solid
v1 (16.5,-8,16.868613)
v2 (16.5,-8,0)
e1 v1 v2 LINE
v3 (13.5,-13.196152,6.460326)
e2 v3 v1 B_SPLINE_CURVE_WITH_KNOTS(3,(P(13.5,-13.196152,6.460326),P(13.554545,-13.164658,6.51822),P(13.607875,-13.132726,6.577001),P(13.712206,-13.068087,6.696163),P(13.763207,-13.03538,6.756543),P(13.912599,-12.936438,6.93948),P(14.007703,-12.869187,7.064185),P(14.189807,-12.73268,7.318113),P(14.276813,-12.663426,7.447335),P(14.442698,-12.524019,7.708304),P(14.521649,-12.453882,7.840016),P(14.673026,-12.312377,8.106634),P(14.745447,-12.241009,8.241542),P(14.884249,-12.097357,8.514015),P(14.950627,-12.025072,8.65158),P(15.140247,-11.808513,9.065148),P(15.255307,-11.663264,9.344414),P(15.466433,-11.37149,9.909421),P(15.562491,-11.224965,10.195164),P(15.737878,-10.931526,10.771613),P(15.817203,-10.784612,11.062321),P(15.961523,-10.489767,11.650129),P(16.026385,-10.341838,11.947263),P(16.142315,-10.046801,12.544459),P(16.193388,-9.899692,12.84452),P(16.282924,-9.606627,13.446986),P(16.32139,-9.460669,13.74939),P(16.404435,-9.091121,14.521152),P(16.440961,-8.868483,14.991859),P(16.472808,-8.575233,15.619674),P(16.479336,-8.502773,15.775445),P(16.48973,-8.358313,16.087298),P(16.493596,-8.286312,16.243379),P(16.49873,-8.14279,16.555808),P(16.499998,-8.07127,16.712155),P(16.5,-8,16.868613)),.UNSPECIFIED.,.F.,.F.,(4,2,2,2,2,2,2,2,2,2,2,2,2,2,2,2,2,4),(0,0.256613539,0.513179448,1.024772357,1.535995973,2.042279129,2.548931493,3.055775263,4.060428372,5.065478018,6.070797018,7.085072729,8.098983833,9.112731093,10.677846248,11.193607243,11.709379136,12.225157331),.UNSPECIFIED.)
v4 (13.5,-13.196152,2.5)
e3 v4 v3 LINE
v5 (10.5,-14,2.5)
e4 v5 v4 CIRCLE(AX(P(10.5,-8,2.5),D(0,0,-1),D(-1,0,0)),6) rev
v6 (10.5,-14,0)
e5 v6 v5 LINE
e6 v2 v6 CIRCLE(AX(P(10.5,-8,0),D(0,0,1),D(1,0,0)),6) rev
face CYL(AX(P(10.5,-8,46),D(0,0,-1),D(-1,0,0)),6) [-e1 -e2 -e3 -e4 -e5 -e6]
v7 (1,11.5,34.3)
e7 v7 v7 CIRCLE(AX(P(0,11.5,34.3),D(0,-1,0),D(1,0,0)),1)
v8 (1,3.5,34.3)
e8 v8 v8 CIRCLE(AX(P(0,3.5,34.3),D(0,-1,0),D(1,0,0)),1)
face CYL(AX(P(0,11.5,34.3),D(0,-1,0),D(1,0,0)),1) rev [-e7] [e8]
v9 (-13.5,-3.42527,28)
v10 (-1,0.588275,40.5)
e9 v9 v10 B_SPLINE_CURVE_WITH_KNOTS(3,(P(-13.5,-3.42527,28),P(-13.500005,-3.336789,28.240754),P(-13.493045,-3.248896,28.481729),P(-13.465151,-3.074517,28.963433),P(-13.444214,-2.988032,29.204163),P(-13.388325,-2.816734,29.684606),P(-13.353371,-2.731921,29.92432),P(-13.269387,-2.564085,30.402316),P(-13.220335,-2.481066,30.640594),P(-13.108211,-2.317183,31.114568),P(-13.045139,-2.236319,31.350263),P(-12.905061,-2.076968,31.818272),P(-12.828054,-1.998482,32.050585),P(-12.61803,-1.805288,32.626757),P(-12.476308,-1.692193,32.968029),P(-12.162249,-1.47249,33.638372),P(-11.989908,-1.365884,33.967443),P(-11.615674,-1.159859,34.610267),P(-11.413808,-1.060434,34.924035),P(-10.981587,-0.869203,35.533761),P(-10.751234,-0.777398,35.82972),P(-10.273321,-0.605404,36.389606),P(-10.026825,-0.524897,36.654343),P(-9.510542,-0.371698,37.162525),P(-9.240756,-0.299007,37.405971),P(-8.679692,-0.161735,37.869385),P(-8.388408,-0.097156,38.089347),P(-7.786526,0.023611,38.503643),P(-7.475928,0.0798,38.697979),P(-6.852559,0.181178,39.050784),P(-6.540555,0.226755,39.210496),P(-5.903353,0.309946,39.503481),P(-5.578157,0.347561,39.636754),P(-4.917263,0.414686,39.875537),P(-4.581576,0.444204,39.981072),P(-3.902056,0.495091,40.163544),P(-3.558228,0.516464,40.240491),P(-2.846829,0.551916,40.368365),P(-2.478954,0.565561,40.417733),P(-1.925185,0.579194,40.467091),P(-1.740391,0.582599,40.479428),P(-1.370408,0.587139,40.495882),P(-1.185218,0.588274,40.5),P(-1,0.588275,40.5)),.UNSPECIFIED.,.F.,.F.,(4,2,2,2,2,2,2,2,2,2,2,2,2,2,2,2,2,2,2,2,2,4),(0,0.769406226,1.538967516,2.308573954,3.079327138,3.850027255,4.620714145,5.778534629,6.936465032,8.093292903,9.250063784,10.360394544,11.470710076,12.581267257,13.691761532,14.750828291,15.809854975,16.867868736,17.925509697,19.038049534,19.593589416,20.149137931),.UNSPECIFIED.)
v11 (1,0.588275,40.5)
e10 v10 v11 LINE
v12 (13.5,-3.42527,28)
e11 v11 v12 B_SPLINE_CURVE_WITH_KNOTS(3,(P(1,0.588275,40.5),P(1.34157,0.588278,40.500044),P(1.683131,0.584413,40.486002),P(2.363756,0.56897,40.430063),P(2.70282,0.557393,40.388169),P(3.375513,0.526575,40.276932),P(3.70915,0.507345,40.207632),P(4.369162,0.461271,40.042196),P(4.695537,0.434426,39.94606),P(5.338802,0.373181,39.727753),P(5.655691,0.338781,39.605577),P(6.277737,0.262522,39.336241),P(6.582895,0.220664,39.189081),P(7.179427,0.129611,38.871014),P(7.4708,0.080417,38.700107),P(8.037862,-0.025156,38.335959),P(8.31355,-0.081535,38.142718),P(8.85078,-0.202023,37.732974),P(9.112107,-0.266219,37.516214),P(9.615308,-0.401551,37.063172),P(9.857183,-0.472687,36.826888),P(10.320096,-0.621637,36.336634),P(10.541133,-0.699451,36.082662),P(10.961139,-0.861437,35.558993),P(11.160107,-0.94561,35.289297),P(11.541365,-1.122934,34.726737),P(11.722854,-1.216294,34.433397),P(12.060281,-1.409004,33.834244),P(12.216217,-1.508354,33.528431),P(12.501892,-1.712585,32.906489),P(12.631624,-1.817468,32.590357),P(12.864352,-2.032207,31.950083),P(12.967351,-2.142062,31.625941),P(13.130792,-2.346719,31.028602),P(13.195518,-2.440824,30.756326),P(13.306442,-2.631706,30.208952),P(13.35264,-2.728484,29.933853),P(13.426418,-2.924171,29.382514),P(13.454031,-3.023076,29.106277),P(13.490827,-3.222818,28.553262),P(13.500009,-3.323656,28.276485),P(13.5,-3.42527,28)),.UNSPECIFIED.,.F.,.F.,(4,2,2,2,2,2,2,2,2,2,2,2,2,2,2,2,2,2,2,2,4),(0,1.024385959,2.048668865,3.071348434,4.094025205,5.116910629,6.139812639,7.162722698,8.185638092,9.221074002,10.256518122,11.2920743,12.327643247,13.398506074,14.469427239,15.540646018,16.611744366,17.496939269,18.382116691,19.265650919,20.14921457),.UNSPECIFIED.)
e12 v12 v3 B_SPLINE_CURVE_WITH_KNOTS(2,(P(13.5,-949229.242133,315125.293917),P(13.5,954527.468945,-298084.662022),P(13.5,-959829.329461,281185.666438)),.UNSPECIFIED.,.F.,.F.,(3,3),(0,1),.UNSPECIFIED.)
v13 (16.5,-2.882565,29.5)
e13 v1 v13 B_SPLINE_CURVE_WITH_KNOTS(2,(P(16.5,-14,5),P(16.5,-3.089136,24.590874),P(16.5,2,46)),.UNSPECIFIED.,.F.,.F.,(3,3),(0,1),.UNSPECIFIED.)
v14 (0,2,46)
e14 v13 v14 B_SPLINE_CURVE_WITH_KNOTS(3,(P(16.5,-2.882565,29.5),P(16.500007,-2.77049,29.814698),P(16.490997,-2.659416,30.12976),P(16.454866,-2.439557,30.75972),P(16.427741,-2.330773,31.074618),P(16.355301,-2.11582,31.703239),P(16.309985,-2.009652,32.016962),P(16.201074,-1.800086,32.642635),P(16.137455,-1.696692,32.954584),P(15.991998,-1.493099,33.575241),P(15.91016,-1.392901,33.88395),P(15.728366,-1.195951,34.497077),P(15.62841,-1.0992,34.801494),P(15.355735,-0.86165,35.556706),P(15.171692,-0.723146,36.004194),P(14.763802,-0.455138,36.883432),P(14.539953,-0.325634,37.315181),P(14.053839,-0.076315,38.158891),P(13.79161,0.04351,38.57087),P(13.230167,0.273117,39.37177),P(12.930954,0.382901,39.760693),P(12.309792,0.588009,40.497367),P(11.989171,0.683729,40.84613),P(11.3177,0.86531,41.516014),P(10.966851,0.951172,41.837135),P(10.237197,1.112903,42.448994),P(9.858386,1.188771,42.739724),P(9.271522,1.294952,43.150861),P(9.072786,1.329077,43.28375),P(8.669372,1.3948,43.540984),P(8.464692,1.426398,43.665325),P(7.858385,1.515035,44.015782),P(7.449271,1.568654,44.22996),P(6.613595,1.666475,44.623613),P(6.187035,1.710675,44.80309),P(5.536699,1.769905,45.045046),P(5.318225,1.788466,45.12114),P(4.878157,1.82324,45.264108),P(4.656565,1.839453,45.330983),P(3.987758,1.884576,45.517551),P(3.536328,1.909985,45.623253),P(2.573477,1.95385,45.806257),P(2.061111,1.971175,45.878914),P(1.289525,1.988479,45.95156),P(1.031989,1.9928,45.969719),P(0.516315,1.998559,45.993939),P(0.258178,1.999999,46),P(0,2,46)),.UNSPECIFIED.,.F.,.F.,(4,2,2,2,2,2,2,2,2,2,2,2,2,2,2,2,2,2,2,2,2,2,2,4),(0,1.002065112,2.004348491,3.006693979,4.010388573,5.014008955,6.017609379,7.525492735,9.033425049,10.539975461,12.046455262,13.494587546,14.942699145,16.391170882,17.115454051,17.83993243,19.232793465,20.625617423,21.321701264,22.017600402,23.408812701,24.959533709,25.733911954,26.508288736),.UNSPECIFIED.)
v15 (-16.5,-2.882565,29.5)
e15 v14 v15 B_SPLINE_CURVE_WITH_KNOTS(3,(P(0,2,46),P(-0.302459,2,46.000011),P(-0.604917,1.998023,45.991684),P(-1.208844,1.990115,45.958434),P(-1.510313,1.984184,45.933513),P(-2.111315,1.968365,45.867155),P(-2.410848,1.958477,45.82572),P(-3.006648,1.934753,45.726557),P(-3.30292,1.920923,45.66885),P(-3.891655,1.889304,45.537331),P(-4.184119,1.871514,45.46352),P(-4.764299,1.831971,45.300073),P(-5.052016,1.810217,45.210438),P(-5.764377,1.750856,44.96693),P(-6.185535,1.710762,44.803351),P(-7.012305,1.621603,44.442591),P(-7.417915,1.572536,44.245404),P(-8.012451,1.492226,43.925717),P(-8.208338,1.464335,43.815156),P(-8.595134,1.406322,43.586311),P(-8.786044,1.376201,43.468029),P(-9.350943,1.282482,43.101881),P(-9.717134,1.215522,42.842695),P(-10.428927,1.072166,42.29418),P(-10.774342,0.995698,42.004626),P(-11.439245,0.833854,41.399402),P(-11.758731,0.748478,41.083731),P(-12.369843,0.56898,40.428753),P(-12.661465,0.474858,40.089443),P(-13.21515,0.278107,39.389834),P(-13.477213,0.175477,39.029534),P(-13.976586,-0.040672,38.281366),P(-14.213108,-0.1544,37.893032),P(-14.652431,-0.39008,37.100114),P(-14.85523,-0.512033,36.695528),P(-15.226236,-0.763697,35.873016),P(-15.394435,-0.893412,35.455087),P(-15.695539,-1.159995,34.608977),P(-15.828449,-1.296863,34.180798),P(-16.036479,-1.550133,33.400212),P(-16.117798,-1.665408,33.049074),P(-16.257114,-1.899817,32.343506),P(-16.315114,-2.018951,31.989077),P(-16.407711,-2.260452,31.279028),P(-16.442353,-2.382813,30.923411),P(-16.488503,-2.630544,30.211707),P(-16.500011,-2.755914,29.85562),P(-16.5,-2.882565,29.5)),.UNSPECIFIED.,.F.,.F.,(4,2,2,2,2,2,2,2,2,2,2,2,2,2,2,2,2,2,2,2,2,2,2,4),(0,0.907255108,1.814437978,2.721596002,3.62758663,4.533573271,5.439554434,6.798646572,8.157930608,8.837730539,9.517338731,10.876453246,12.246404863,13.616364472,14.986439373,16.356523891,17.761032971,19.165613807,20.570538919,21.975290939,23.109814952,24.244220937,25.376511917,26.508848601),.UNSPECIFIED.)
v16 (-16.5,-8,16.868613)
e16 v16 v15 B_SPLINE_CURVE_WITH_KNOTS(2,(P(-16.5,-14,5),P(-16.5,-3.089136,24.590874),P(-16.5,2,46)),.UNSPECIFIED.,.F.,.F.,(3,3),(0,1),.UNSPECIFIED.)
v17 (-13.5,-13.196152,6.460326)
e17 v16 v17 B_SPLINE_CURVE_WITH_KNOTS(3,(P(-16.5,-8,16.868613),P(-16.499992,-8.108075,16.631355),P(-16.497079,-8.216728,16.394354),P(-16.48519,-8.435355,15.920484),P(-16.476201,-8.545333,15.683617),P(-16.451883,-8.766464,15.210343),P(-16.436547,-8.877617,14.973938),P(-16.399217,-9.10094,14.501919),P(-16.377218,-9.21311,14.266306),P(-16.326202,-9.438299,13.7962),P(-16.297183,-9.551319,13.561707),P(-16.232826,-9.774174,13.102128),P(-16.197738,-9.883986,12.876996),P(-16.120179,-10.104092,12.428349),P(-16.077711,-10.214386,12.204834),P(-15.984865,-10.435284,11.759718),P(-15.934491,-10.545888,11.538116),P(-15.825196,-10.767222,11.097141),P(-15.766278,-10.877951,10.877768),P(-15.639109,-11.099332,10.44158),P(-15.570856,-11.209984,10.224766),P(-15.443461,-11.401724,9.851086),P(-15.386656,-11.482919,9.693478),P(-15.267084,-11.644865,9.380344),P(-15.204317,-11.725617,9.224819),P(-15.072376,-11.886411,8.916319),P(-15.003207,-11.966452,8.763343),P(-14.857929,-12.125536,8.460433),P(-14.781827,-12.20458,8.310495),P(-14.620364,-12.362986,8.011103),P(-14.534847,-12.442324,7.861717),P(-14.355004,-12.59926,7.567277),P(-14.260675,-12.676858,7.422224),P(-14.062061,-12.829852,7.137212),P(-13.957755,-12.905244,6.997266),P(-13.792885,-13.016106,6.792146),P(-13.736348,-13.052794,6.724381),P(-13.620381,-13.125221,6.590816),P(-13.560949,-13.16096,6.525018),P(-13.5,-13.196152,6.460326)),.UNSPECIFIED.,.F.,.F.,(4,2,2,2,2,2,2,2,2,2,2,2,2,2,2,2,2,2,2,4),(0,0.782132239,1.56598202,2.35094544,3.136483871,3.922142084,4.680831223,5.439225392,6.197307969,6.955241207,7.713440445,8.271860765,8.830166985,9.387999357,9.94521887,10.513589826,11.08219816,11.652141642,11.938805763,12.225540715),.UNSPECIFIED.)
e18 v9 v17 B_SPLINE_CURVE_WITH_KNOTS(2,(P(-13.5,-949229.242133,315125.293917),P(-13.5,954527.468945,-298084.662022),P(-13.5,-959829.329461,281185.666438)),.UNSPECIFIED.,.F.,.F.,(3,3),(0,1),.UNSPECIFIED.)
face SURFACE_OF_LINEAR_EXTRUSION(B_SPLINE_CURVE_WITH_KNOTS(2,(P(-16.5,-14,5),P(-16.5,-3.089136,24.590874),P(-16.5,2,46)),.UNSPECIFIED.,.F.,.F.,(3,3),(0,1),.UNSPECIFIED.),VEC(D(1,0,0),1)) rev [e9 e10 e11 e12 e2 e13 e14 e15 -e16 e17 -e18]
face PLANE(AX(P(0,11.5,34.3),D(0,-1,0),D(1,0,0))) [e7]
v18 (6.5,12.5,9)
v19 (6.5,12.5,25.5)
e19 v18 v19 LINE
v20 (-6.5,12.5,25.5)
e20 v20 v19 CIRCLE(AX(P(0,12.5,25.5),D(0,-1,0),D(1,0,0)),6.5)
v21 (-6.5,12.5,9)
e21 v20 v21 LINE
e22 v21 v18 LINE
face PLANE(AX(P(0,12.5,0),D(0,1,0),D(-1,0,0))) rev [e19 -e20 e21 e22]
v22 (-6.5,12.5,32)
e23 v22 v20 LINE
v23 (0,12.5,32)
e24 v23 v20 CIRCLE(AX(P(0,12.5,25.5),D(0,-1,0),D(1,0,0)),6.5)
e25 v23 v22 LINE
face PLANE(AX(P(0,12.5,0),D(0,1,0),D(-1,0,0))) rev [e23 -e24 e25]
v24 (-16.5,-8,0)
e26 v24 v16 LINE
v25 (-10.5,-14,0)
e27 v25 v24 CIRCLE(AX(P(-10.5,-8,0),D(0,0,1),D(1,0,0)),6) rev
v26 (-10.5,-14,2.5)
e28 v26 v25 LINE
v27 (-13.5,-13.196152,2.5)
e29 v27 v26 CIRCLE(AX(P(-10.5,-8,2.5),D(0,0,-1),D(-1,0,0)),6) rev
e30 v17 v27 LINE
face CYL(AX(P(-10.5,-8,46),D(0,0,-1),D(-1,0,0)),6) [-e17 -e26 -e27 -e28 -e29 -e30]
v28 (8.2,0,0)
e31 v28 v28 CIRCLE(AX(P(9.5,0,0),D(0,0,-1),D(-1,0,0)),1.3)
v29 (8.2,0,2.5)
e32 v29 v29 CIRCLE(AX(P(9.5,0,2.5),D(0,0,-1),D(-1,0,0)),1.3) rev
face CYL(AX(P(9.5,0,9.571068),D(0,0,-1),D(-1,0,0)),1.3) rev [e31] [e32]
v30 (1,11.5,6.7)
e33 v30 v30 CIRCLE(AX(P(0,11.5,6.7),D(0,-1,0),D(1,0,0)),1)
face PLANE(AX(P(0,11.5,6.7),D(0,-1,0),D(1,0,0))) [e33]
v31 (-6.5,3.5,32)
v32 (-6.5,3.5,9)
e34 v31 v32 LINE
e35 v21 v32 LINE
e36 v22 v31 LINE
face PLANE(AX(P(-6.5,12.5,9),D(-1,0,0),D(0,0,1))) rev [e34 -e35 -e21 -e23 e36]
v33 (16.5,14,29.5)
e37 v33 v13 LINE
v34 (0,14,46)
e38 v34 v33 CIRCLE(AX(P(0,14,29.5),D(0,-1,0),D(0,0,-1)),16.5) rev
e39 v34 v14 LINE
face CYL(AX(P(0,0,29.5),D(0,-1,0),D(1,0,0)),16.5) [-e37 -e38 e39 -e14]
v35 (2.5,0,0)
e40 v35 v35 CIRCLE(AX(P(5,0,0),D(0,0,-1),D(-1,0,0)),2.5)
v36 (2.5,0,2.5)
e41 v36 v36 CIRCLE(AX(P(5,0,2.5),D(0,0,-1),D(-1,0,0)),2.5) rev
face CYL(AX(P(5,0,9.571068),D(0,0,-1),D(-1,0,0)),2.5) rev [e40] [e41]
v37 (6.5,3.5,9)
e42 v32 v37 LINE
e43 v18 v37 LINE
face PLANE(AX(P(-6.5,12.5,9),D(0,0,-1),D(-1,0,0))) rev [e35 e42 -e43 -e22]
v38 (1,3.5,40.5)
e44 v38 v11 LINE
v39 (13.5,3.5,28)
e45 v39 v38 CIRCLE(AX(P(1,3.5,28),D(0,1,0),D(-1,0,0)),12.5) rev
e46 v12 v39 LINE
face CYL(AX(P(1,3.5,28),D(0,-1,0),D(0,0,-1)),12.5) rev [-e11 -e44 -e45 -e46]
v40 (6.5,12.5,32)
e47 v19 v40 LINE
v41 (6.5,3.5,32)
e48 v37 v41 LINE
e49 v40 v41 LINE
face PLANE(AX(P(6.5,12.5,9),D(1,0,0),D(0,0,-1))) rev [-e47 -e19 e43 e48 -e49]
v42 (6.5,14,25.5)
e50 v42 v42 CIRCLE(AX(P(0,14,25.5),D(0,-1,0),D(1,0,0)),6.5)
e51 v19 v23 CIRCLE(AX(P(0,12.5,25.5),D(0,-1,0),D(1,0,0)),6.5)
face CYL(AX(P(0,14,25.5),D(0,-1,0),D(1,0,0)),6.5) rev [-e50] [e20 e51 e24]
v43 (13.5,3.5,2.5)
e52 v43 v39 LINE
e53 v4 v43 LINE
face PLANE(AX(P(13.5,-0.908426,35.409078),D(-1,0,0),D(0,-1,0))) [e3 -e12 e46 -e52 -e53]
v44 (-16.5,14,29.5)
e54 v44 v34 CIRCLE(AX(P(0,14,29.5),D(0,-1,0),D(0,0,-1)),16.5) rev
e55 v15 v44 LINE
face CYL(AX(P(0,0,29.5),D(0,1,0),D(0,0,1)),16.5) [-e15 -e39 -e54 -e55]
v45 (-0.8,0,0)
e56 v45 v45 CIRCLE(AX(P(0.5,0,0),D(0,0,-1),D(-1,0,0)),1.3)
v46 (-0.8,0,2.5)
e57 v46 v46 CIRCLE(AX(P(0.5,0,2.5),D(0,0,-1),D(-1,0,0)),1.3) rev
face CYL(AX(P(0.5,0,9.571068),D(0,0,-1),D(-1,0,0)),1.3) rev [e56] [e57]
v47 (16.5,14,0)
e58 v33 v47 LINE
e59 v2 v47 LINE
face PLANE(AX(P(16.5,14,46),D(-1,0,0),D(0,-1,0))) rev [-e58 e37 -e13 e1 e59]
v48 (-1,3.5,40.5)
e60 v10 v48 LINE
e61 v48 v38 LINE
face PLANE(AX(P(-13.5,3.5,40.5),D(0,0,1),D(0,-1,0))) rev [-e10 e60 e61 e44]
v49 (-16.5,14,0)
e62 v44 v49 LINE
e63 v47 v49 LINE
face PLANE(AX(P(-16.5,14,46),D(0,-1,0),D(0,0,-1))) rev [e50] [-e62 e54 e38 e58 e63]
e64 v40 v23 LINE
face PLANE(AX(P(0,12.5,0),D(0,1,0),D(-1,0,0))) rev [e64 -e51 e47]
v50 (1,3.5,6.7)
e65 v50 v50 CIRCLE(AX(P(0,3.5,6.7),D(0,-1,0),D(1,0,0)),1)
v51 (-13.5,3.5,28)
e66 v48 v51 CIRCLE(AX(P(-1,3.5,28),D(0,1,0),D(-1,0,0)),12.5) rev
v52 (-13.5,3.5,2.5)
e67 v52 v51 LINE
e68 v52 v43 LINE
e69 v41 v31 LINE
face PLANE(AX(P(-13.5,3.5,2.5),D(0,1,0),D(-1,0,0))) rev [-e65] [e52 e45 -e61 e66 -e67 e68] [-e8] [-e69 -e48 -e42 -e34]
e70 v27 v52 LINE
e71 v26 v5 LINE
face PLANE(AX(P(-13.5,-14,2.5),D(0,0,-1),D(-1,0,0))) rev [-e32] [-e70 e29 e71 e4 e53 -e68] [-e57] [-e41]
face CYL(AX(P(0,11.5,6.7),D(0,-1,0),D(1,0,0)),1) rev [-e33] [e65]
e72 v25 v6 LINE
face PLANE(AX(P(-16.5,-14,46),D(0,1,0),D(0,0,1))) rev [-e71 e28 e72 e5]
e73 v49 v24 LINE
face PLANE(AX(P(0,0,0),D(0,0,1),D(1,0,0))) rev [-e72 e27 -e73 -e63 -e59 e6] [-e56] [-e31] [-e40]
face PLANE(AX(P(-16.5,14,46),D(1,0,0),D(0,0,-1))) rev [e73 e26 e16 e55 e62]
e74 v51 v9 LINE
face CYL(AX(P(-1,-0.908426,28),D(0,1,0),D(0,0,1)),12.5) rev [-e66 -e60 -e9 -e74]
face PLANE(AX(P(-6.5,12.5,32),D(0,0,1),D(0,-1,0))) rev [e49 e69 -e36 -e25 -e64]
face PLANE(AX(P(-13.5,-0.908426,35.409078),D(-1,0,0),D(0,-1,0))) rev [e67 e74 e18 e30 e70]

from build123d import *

# Parameters (mm, degrees)
SKETCH1_W           = 33
SKETCH1_H           = 28
BOSS_EXTRUDE1_DEPTH = 46
CUT_EXTRUDE1_DEPTH  = 59.318093247
CUT_EXTRUDE2_START  = -3
CUT_EXTRUDE2_DEPTH  = 27
FILLET1_R           = 12.5
FILLET2_R           = 16.5
FILLET3_R           = 6
SKETCH5_W           = 13
SKETCH5_H           = 23
CUT_EXTRUDE3_DEPTH  = 9
SKETCH6_R           = 6.5
CUT_EXTRUDE5_DEPTH  = 56.592265809
SKETCH7_R           = 1
CUT_EXTRUDE6_DEPTH  = 8
SKETCH8_R           = 1.3
SKETCH8_R_2         = 2.5
CUT_EXTRUDE7_DEPTH  = 2.5


with BuildPart() as part:
    # Sketch1 → Boss-Extrude1 (new body)
    with BuildSketch(Plane.XY):
        Rectangle(SKETCH1_W, SKETCH1_H)
    extrude(amount=BOSS_EXTRUDE1_DEPTH)

    # Sketch3 → Cut-Extrude1 (cut, through all)
    with BuildSketch(Plane(origin=(16.5, 0, 0), x_dir=(0, 0, -1), z_dir=(1, 0, 0))):
        with BuildLine():
            Line((-5, -14), (-46, -14))
            Line((-46, -14), (-46, 2))
            add(Edge.make_bspline(
                [(-46, 2), (-24.590873565, -3.089136006), (-5, -14)],
                knots=[0, 0, 0, 1, 1, 1], degree=2))
        make_face()
    extrude(amount=-CUT_EXTRUDE1_DEPTH, mode=Mode.SUBTRACT)

    # Sketch4 → Cut-Extrude2 (cut)
    with BuildSketch(Plane(origin=(16.5, 0, 0), x_dir=(0, 0, -1), z_dir=(1, 0, 0)).offset(CUT_EXTRUDE2_START)):
        with BuildLine():
            Line((-5, -14), (-2.5, -14))
            Line((-2.5, -14), (-2.5, 3.5))
            Line((-2.5, 3.5), (-40.5, 3.5))
            Line((-40.5, 3.5), (-40.5, 0.588274649))
            add(Edge.make_bspline(
                [(-5, -14), (-22.060550055, -4.498364419), (-40.5, 0.588274649)],
                knots=[0, 0, 0, 1, 1, 1], degree=2))
        make_face()
    extrude(amount=-CUT_EXTRUDE2_DEPTH, mode=Mode.SUBTRACT)

    # Fillet1
    fillet1_edges = [part.edges().sort_by_distance(p)[0] for p in [
        (13.5, 2.044137325, 40.5),
        (-13.5, 2.044137325, 40.5),
    ]]
    fillet(fillet1_edges, radius=FILLET1_R)

    # Fillet2
    fillet2_edges = [part.edges().sort_by_distance(p)[0] for p in [
        (16.5, 8, 46),
        (-16.5, 8, 46),
    ]]
    fillet(fillet2_edges, radius=FILLET2_R - 0.0001)  # a hair under: the kernel refuses the full size

    # Fillet3
    fillet3_edges = [part.edges().sort_by_distance(p)[0] for p in [
        (-16.5, -14, 2.5),
        (16.5, -14, 2.5),
    ]]
    fillet(fillet3_edges, radius=FILLET3_R)

    # Sketch5 → Cut-Extrude3 (cut)
    with BuildSketch(Plane.XZ.offset(-3.5)):
        with Locations((0, 20.5)):
            Rectangle(SKETCH5_W, SKETCH5_H)
    extrude(amount=-CUT_EXTRUDE3_DEPTH, mode=Mode.SUBTRACT)

    # Sketch6 → Cut-Extrude5 (cut, through all)
    with BuildSketch(Plane.XZ.offset(-12.5)):
        with Locations((0, 25.5)):
            Circle(SKETCH6_R)
    extrude(amount=-CUT_EXTRUDE5_DEPTH, mode=Mode.SUBTRACT)

    # Sketch7 → Cut-Extrude6 (cut)
    with BuildSketch(Plane.XZ.offset(-3.5)):
        with Locations((0, 34.3)):
            Circle(SKETCH7_R)
        with Locations((0, 6.7)):
            Circle(SKETCH7_R)
    extrude(amount=-CUT_EXTRUDE6_DEPTH, mode=Mode.SUBTRACT)

    # Sketch8 → Cut-Extrude7 (cut)
    with BuildSketch(Plane(origin=(0, 0, 0), x_dir=(-1, 0, 0), z_dir=(0, 0, -1))):
        with Locations((-9.5, 0)):
            Circle(SKETCH8_R)
        with Locations((-5, 0)):
            Circle(SKETCH8_R_2)
        with Locations((-0.5, 0)):
            Circle(SKETCH8_R)
    extrude(amount=-CUT_EXTRUDE7_DEPTH, mode=Mode.SUBTRACT)


solid = part.part
